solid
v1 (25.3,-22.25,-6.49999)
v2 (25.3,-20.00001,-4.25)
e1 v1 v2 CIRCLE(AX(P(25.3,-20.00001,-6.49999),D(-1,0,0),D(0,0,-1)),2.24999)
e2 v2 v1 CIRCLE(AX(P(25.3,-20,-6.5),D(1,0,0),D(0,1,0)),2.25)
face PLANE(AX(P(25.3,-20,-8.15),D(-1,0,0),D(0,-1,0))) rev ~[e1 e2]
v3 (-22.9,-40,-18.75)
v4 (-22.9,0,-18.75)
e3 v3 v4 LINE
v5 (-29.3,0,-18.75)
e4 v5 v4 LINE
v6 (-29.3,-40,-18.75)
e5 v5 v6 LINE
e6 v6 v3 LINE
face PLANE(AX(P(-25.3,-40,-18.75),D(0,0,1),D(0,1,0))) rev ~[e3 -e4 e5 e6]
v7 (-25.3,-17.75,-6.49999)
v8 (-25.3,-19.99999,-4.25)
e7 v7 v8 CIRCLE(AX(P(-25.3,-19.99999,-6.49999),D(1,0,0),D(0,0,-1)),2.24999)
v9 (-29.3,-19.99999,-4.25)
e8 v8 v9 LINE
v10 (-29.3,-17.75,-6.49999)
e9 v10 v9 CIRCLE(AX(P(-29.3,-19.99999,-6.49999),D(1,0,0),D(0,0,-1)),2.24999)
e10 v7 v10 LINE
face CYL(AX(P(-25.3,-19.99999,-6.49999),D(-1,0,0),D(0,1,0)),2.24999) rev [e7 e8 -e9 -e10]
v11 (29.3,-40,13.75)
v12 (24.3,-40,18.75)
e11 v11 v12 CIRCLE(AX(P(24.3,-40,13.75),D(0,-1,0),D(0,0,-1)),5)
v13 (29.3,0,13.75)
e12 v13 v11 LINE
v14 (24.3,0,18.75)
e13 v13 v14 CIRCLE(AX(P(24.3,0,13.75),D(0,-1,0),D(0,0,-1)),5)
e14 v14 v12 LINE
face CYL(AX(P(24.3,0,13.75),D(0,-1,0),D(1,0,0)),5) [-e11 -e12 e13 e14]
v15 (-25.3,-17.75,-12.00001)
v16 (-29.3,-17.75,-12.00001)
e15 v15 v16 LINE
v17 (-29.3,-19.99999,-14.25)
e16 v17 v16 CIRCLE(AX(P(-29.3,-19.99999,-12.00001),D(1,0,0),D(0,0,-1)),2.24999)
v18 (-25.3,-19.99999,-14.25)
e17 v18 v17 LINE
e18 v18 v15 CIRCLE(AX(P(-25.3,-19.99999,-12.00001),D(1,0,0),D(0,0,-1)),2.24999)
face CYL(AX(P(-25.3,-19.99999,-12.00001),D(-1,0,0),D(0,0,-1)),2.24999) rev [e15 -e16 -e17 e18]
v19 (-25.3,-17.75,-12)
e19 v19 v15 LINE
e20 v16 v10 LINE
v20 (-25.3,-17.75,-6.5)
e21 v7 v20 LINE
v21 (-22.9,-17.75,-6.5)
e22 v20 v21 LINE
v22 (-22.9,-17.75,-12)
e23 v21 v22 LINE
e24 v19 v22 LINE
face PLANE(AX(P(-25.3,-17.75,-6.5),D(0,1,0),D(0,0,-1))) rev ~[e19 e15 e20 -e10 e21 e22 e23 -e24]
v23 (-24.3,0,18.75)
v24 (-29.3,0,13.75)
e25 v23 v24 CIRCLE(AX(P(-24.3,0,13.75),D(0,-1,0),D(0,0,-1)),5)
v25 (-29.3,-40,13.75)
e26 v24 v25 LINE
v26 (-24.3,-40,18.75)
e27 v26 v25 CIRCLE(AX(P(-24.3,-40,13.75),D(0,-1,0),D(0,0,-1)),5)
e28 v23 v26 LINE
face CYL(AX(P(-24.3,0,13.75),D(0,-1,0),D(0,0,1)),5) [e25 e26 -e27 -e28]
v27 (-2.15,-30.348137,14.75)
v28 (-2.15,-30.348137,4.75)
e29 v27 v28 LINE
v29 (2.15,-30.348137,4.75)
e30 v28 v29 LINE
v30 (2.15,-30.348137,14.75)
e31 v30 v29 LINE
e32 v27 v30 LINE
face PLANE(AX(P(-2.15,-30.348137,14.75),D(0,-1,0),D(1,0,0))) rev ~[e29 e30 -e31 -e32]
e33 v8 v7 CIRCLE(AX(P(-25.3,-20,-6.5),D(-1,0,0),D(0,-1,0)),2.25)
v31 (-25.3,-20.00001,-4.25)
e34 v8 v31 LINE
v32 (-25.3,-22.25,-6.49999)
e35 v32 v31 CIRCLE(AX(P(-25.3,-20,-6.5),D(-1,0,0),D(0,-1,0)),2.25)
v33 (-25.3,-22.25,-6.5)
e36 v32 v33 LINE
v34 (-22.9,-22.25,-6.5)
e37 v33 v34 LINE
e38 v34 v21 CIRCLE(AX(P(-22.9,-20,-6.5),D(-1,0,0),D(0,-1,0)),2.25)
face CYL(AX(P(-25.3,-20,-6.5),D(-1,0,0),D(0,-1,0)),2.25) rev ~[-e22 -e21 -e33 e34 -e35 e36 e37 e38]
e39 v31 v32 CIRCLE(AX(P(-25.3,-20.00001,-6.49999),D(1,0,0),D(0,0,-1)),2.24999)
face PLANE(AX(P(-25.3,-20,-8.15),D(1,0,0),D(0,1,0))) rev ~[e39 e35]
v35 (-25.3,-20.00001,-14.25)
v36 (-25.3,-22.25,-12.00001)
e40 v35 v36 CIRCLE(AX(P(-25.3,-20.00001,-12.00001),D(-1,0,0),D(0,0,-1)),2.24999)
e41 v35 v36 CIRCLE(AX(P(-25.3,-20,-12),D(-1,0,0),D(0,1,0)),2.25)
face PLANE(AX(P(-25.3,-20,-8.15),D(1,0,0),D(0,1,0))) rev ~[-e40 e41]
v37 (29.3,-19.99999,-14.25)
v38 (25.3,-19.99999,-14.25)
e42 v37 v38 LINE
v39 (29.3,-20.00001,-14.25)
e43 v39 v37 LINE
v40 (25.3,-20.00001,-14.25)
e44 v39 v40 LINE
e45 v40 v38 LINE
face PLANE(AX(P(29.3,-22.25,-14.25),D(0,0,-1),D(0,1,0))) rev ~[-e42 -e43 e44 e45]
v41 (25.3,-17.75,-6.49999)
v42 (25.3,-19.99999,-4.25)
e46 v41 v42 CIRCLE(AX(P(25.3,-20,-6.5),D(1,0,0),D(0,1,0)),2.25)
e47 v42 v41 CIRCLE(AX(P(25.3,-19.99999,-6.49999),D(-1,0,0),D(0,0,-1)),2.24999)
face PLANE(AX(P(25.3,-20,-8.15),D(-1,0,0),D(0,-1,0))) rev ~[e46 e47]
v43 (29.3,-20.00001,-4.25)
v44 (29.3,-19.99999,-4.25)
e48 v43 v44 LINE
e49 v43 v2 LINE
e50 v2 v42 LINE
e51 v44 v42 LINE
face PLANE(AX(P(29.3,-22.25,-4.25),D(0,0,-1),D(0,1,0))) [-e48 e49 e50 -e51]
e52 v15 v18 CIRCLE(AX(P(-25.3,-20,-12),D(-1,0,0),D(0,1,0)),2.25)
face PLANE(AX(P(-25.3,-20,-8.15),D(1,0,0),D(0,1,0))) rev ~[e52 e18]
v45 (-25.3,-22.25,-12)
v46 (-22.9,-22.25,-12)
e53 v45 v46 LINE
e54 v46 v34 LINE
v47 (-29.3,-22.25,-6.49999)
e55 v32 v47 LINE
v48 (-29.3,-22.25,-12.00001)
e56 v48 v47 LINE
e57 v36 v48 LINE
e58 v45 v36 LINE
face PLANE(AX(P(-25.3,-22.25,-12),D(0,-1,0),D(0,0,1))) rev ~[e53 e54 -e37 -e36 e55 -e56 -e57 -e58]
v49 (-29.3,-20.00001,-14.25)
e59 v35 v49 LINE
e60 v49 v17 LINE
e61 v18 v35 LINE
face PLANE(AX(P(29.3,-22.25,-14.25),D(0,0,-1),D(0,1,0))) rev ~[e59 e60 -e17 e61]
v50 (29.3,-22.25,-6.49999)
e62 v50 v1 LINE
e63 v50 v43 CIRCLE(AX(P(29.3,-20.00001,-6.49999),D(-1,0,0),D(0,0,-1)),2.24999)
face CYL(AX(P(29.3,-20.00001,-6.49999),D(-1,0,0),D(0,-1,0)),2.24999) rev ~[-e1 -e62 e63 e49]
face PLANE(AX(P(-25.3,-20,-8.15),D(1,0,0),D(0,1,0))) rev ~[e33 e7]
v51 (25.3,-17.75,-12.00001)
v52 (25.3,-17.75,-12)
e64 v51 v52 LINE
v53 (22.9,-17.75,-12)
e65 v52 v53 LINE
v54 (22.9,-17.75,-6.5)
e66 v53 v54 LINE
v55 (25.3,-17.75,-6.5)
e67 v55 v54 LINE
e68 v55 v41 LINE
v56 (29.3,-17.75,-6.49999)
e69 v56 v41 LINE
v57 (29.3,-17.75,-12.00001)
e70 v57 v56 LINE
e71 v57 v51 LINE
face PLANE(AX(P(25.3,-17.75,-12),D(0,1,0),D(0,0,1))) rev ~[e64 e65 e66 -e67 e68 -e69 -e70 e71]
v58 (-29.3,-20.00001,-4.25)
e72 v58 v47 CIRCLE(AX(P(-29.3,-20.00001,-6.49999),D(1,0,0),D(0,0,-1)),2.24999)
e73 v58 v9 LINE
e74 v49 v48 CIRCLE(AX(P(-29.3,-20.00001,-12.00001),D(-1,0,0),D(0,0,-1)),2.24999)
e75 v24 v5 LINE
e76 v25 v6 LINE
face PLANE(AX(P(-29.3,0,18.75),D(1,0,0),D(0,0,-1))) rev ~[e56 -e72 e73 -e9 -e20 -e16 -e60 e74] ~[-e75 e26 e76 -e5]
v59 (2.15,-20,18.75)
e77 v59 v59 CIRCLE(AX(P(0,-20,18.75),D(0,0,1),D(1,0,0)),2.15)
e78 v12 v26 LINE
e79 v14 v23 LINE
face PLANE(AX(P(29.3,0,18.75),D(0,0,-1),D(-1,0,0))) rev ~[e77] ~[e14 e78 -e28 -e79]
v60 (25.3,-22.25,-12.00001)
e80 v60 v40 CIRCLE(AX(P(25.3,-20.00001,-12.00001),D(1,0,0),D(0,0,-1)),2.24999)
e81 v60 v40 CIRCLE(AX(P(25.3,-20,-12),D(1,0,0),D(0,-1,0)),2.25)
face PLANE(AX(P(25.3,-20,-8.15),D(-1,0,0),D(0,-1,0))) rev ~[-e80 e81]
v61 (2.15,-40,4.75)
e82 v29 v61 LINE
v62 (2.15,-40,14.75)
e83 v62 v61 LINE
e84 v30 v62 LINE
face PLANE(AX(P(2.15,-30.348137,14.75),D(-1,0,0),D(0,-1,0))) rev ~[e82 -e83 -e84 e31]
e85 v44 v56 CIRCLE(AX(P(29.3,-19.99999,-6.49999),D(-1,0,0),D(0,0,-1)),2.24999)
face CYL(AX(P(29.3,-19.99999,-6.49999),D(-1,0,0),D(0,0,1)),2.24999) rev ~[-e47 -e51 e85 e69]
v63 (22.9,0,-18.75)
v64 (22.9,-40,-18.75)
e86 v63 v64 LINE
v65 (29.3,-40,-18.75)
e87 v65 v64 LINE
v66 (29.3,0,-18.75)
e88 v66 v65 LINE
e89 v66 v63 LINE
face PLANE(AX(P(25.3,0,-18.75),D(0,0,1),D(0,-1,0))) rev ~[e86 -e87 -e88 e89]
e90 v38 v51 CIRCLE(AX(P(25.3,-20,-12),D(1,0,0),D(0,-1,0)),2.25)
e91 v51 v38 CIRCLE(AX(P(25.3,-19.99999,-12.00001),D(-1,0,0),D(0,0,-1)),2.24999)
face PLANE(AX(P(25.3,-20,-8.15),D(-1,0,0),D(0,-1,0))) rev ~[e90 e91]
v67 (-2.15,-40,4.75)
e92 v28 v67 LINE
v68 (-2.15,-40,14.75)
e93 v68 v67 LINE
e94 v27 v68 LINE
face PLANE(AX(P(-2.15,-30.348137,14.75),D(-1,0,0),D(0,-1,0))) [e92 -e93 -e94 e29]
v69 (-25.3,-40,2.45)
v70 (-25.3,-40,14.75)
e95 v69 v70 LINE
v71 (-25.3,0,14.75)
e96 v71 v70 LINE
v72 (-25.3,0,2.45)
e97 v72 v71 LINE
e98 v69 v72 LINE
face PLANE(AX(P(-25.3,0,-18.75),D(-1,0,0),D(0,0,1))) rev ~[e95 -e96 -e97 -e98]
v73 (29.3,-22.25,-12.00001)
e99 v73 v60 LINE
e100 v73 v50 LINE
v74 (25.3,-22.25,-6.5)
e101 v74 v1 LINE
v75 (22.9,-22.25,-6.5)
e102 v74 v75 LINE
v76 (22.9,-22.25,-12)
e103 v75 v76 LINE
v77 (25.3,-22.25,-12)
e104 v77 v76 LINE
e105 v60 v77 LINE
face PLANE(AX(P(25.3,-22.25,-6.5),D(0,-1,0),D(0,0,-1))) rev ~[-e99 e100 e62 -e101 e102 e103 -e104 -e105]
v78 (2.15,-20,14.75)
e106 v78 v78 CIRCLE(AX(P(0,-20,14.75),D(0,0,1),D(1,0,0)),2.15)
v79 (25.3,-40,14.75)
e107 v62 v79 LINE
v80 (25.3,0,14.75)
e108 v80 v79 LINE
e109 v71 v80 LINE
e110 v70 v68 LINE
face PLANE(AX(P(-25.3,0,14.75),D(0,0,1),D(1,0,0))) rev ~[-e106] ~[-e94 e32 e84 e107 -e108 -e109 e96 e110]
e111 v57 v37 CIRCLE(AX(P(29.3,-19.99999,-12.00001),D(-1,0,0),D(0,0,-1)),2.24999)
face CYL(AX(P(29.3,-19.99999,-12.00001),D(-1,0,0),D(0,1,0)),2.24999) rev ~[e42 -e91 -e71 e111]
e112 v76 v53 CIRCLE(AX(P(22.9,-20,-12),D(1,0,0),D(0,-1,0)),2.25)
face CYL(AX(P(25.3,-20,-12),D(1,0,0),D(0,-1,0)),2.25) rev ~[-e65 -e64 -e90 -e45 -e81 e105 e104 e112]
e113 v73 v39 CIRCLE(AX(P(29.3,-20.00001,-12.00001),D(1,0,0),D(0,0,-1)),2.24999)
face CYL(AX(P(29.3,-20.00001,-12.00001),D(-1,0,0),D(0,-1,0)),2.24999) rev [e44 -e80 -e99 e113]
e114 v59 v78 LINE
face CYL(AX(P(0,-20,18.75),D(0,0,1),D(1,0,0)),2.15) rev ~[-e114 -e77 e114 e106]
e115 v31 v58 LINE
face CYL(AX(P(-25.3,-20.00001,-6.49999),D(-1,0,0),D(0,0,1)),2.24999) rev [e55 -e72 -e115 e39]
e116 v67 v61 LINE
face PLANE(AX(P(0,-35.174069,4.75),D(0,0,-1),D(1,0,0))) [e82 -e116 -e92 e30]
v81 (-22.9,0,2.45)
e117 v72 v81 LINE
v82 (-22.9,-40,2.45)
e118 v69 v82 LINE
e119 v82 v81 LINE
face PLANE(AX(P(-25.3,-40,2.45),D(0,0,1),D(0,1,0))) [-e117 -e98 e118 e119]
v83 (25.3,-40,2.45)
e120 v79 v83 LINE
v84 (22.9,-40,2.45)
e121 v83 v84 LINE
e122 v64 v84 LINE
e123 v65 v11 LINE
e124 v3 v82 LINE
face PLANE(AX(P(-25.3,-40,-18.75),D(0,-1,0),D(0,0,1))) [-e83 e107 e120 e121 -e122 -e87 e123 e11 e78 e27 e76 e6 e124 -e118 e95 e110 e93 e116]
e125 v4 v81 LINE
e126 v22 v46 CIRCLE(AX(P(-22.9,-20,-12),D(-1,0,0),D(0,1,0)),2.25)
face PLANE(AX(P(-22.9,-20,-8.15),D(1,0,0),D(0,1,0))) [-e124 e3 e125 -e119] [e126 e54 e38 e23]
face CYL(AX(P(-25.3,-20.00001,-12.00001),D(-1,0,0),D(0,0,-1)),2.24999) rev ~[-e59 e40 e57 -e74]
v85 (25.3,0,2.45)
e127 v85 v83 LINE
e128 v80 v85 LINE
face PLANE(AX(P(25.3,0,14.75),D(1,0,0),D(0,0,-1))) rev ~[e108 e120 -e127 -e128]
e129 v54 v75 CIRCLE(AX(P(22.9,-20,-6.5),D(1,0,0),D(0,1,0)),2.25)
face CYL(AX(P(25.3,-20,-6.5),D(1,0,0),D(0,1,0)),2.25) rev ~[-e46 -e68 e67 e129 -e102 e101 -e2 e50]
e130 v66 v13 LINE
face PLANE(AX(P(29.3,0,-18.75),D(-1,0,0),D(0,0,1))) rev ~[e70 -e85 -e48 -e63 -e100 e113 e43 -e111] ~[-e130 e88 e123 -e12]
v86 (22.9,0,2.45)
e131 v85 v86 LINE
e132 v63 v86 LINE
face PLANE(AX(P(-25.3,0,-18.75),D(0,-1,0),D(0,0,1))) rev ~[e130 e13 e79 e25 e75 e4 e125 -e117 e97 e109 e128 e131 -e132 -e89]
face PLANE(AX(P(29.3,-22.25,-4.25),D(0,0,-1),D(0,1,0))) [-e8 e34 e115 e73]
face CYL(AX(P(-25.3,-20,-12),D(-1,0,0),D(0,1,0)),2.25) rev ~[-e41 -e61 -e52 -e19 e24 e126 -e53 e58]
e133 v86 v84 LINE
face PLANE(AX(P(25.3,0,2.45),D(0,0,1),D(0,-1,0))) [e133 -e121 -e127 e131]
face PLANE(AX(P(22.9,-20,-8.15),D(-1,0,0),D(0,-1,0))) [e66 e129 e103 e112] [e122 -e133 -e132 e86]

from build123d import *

# Parameters (mm, degrees)
F1_DEPTH  = 40
F2_R      = 5
F3_R      = 2.15
F4_DEPTH  = 25
F5_W      = 4.5
F5_H      = 10
F6_DEPTH  = 58.601
F7_R      = 2.24999
F8_W      = 40
F8_H      = 21.2
F9_DEPTH  = 2.4
F10_W     = 40
F10_H     = 21.2
F11_DEPTH = 2.4
F12_W     = 4.3
F12_H     = 9.6518629789
F13_DEPTH = 10


# Not quite as in the source:
# - a fillet or chamfer is up to 0.001 mm smaller than in the source, because OpenCascade refuses the exact size


with BuildPart() as f1:
    # F0 (on Front) → F1 (new body)
    with BuildSketch(Plane.XZ):
        Polygon((25.3, -18.75), (29.3, -18.75), (29.3, 18.75), (-29.3, 18.75), (-29.3, -18.75), (-25.3, -18.75), (-25.3, 14.75), (25.3, 14.75), align=None)
    extrude(amount=F1_DEPTH)

    # F2
    f2_edges = [f1.edges().sort_by_distance(p)[0] for p in [
        (-29.3, -20, 18.75),
        (29.3, -20, 18.75),
    ]]
    fillet(f2_edges, radius=F2_R)

    # F3 (on face) → F4 (cut)
    with BuildSketch(Plane.XY.offset(18.75)):
        with Locations((0, -20)):
            Circle(F3_R)
    extrude(amount=-F4_DEPTH, mode=Mode.SUBTRACT)

    # F5 (on face) → F6 (cut, through all)
    with BuildSketch(Plane.YZ.offset(29.3)):
        with Locations((-20, -9.25)):
            Rectangle(F5_W, F5_H)
    extrude(amount=-F6_DEPTH, mode=Mode.SUBTRACT)

    # F7 (radius 2.25 in the source; OpenCascade refuses exactly that, so slightly less here)
    f7_edges = [f1.edges().sort_by_distance(p)[0] for p in [
        (27.3, -17.75, -4.25),
        (27.3, -22.25, -4.25),
        (27.3, -17.75, -14.25),
        (27.3, -22.25, -14.25),
        (-27.3, -17.75, -4.25),
        (-27.3, -17.75, -14.25),
        (-27.3, -22.25, -4.25),
        (-27.3, -22.25, -14.25),
    ]]
    fillet(f7_edges, radius=F7_R)

    # F8 (on face) → F9 (join)
    with BuildSketch(Plane(origin=(25.3, 0, 0), x_dir=(0, -1, 0), z_dir=(-1, 0, 0))):
        with Locations((20, -8.15)):
            Rectangle(F8_W, F8_H)
        with BuildLine():
            ThreePointArc((17.75, -6.5), (20, -4.25), (22.25, -6.5))
            Line((22.25, -6.5), (22.25, -12))
            ThreePointArc((22.25, -12), (20, -14.25), (17.75, -12))
            Line((17.75, -12), (17.75, -6.5))
        make_face(mode=Mode.SUBTRACT)
    extrude(amount=F9_DEPTH)

    # F10 (on face) → F11 (join)
    with BuildSketch(Plane.YZ.offset(-25.3)):
        with Locations((-20, -8.15)):
            Rectangle(F10_W, F10_H)
        with BuildLine():
            ThreePointArc((-22.25, -6.5), (-20, -4.25), (-17.75, -6.5))
            Line((-17.75, -6.5), (-17.75, -12))
            ThreePointArc((-17.75, -12), (-20, -14.25), (-22.25, -12))
            Line((-22.25, -12), (-22.25, -6.5))
        make_face(mode=Mode.SUBTRACT)
    extrude(amount=F11_DEPTH)

    # F12 (on face) → F13 (join)
    with BuildSketch(Plane(origin=(0, 0, 14.75), x_dir=(1, 0, 0), z_dir=(0, 0, -1))):
        with Locations((0, 35.1740685105)):
            Rectangle(F12_W, F12_H)
    extrude(amount=F13_DEPTH)


solid = f1.part
